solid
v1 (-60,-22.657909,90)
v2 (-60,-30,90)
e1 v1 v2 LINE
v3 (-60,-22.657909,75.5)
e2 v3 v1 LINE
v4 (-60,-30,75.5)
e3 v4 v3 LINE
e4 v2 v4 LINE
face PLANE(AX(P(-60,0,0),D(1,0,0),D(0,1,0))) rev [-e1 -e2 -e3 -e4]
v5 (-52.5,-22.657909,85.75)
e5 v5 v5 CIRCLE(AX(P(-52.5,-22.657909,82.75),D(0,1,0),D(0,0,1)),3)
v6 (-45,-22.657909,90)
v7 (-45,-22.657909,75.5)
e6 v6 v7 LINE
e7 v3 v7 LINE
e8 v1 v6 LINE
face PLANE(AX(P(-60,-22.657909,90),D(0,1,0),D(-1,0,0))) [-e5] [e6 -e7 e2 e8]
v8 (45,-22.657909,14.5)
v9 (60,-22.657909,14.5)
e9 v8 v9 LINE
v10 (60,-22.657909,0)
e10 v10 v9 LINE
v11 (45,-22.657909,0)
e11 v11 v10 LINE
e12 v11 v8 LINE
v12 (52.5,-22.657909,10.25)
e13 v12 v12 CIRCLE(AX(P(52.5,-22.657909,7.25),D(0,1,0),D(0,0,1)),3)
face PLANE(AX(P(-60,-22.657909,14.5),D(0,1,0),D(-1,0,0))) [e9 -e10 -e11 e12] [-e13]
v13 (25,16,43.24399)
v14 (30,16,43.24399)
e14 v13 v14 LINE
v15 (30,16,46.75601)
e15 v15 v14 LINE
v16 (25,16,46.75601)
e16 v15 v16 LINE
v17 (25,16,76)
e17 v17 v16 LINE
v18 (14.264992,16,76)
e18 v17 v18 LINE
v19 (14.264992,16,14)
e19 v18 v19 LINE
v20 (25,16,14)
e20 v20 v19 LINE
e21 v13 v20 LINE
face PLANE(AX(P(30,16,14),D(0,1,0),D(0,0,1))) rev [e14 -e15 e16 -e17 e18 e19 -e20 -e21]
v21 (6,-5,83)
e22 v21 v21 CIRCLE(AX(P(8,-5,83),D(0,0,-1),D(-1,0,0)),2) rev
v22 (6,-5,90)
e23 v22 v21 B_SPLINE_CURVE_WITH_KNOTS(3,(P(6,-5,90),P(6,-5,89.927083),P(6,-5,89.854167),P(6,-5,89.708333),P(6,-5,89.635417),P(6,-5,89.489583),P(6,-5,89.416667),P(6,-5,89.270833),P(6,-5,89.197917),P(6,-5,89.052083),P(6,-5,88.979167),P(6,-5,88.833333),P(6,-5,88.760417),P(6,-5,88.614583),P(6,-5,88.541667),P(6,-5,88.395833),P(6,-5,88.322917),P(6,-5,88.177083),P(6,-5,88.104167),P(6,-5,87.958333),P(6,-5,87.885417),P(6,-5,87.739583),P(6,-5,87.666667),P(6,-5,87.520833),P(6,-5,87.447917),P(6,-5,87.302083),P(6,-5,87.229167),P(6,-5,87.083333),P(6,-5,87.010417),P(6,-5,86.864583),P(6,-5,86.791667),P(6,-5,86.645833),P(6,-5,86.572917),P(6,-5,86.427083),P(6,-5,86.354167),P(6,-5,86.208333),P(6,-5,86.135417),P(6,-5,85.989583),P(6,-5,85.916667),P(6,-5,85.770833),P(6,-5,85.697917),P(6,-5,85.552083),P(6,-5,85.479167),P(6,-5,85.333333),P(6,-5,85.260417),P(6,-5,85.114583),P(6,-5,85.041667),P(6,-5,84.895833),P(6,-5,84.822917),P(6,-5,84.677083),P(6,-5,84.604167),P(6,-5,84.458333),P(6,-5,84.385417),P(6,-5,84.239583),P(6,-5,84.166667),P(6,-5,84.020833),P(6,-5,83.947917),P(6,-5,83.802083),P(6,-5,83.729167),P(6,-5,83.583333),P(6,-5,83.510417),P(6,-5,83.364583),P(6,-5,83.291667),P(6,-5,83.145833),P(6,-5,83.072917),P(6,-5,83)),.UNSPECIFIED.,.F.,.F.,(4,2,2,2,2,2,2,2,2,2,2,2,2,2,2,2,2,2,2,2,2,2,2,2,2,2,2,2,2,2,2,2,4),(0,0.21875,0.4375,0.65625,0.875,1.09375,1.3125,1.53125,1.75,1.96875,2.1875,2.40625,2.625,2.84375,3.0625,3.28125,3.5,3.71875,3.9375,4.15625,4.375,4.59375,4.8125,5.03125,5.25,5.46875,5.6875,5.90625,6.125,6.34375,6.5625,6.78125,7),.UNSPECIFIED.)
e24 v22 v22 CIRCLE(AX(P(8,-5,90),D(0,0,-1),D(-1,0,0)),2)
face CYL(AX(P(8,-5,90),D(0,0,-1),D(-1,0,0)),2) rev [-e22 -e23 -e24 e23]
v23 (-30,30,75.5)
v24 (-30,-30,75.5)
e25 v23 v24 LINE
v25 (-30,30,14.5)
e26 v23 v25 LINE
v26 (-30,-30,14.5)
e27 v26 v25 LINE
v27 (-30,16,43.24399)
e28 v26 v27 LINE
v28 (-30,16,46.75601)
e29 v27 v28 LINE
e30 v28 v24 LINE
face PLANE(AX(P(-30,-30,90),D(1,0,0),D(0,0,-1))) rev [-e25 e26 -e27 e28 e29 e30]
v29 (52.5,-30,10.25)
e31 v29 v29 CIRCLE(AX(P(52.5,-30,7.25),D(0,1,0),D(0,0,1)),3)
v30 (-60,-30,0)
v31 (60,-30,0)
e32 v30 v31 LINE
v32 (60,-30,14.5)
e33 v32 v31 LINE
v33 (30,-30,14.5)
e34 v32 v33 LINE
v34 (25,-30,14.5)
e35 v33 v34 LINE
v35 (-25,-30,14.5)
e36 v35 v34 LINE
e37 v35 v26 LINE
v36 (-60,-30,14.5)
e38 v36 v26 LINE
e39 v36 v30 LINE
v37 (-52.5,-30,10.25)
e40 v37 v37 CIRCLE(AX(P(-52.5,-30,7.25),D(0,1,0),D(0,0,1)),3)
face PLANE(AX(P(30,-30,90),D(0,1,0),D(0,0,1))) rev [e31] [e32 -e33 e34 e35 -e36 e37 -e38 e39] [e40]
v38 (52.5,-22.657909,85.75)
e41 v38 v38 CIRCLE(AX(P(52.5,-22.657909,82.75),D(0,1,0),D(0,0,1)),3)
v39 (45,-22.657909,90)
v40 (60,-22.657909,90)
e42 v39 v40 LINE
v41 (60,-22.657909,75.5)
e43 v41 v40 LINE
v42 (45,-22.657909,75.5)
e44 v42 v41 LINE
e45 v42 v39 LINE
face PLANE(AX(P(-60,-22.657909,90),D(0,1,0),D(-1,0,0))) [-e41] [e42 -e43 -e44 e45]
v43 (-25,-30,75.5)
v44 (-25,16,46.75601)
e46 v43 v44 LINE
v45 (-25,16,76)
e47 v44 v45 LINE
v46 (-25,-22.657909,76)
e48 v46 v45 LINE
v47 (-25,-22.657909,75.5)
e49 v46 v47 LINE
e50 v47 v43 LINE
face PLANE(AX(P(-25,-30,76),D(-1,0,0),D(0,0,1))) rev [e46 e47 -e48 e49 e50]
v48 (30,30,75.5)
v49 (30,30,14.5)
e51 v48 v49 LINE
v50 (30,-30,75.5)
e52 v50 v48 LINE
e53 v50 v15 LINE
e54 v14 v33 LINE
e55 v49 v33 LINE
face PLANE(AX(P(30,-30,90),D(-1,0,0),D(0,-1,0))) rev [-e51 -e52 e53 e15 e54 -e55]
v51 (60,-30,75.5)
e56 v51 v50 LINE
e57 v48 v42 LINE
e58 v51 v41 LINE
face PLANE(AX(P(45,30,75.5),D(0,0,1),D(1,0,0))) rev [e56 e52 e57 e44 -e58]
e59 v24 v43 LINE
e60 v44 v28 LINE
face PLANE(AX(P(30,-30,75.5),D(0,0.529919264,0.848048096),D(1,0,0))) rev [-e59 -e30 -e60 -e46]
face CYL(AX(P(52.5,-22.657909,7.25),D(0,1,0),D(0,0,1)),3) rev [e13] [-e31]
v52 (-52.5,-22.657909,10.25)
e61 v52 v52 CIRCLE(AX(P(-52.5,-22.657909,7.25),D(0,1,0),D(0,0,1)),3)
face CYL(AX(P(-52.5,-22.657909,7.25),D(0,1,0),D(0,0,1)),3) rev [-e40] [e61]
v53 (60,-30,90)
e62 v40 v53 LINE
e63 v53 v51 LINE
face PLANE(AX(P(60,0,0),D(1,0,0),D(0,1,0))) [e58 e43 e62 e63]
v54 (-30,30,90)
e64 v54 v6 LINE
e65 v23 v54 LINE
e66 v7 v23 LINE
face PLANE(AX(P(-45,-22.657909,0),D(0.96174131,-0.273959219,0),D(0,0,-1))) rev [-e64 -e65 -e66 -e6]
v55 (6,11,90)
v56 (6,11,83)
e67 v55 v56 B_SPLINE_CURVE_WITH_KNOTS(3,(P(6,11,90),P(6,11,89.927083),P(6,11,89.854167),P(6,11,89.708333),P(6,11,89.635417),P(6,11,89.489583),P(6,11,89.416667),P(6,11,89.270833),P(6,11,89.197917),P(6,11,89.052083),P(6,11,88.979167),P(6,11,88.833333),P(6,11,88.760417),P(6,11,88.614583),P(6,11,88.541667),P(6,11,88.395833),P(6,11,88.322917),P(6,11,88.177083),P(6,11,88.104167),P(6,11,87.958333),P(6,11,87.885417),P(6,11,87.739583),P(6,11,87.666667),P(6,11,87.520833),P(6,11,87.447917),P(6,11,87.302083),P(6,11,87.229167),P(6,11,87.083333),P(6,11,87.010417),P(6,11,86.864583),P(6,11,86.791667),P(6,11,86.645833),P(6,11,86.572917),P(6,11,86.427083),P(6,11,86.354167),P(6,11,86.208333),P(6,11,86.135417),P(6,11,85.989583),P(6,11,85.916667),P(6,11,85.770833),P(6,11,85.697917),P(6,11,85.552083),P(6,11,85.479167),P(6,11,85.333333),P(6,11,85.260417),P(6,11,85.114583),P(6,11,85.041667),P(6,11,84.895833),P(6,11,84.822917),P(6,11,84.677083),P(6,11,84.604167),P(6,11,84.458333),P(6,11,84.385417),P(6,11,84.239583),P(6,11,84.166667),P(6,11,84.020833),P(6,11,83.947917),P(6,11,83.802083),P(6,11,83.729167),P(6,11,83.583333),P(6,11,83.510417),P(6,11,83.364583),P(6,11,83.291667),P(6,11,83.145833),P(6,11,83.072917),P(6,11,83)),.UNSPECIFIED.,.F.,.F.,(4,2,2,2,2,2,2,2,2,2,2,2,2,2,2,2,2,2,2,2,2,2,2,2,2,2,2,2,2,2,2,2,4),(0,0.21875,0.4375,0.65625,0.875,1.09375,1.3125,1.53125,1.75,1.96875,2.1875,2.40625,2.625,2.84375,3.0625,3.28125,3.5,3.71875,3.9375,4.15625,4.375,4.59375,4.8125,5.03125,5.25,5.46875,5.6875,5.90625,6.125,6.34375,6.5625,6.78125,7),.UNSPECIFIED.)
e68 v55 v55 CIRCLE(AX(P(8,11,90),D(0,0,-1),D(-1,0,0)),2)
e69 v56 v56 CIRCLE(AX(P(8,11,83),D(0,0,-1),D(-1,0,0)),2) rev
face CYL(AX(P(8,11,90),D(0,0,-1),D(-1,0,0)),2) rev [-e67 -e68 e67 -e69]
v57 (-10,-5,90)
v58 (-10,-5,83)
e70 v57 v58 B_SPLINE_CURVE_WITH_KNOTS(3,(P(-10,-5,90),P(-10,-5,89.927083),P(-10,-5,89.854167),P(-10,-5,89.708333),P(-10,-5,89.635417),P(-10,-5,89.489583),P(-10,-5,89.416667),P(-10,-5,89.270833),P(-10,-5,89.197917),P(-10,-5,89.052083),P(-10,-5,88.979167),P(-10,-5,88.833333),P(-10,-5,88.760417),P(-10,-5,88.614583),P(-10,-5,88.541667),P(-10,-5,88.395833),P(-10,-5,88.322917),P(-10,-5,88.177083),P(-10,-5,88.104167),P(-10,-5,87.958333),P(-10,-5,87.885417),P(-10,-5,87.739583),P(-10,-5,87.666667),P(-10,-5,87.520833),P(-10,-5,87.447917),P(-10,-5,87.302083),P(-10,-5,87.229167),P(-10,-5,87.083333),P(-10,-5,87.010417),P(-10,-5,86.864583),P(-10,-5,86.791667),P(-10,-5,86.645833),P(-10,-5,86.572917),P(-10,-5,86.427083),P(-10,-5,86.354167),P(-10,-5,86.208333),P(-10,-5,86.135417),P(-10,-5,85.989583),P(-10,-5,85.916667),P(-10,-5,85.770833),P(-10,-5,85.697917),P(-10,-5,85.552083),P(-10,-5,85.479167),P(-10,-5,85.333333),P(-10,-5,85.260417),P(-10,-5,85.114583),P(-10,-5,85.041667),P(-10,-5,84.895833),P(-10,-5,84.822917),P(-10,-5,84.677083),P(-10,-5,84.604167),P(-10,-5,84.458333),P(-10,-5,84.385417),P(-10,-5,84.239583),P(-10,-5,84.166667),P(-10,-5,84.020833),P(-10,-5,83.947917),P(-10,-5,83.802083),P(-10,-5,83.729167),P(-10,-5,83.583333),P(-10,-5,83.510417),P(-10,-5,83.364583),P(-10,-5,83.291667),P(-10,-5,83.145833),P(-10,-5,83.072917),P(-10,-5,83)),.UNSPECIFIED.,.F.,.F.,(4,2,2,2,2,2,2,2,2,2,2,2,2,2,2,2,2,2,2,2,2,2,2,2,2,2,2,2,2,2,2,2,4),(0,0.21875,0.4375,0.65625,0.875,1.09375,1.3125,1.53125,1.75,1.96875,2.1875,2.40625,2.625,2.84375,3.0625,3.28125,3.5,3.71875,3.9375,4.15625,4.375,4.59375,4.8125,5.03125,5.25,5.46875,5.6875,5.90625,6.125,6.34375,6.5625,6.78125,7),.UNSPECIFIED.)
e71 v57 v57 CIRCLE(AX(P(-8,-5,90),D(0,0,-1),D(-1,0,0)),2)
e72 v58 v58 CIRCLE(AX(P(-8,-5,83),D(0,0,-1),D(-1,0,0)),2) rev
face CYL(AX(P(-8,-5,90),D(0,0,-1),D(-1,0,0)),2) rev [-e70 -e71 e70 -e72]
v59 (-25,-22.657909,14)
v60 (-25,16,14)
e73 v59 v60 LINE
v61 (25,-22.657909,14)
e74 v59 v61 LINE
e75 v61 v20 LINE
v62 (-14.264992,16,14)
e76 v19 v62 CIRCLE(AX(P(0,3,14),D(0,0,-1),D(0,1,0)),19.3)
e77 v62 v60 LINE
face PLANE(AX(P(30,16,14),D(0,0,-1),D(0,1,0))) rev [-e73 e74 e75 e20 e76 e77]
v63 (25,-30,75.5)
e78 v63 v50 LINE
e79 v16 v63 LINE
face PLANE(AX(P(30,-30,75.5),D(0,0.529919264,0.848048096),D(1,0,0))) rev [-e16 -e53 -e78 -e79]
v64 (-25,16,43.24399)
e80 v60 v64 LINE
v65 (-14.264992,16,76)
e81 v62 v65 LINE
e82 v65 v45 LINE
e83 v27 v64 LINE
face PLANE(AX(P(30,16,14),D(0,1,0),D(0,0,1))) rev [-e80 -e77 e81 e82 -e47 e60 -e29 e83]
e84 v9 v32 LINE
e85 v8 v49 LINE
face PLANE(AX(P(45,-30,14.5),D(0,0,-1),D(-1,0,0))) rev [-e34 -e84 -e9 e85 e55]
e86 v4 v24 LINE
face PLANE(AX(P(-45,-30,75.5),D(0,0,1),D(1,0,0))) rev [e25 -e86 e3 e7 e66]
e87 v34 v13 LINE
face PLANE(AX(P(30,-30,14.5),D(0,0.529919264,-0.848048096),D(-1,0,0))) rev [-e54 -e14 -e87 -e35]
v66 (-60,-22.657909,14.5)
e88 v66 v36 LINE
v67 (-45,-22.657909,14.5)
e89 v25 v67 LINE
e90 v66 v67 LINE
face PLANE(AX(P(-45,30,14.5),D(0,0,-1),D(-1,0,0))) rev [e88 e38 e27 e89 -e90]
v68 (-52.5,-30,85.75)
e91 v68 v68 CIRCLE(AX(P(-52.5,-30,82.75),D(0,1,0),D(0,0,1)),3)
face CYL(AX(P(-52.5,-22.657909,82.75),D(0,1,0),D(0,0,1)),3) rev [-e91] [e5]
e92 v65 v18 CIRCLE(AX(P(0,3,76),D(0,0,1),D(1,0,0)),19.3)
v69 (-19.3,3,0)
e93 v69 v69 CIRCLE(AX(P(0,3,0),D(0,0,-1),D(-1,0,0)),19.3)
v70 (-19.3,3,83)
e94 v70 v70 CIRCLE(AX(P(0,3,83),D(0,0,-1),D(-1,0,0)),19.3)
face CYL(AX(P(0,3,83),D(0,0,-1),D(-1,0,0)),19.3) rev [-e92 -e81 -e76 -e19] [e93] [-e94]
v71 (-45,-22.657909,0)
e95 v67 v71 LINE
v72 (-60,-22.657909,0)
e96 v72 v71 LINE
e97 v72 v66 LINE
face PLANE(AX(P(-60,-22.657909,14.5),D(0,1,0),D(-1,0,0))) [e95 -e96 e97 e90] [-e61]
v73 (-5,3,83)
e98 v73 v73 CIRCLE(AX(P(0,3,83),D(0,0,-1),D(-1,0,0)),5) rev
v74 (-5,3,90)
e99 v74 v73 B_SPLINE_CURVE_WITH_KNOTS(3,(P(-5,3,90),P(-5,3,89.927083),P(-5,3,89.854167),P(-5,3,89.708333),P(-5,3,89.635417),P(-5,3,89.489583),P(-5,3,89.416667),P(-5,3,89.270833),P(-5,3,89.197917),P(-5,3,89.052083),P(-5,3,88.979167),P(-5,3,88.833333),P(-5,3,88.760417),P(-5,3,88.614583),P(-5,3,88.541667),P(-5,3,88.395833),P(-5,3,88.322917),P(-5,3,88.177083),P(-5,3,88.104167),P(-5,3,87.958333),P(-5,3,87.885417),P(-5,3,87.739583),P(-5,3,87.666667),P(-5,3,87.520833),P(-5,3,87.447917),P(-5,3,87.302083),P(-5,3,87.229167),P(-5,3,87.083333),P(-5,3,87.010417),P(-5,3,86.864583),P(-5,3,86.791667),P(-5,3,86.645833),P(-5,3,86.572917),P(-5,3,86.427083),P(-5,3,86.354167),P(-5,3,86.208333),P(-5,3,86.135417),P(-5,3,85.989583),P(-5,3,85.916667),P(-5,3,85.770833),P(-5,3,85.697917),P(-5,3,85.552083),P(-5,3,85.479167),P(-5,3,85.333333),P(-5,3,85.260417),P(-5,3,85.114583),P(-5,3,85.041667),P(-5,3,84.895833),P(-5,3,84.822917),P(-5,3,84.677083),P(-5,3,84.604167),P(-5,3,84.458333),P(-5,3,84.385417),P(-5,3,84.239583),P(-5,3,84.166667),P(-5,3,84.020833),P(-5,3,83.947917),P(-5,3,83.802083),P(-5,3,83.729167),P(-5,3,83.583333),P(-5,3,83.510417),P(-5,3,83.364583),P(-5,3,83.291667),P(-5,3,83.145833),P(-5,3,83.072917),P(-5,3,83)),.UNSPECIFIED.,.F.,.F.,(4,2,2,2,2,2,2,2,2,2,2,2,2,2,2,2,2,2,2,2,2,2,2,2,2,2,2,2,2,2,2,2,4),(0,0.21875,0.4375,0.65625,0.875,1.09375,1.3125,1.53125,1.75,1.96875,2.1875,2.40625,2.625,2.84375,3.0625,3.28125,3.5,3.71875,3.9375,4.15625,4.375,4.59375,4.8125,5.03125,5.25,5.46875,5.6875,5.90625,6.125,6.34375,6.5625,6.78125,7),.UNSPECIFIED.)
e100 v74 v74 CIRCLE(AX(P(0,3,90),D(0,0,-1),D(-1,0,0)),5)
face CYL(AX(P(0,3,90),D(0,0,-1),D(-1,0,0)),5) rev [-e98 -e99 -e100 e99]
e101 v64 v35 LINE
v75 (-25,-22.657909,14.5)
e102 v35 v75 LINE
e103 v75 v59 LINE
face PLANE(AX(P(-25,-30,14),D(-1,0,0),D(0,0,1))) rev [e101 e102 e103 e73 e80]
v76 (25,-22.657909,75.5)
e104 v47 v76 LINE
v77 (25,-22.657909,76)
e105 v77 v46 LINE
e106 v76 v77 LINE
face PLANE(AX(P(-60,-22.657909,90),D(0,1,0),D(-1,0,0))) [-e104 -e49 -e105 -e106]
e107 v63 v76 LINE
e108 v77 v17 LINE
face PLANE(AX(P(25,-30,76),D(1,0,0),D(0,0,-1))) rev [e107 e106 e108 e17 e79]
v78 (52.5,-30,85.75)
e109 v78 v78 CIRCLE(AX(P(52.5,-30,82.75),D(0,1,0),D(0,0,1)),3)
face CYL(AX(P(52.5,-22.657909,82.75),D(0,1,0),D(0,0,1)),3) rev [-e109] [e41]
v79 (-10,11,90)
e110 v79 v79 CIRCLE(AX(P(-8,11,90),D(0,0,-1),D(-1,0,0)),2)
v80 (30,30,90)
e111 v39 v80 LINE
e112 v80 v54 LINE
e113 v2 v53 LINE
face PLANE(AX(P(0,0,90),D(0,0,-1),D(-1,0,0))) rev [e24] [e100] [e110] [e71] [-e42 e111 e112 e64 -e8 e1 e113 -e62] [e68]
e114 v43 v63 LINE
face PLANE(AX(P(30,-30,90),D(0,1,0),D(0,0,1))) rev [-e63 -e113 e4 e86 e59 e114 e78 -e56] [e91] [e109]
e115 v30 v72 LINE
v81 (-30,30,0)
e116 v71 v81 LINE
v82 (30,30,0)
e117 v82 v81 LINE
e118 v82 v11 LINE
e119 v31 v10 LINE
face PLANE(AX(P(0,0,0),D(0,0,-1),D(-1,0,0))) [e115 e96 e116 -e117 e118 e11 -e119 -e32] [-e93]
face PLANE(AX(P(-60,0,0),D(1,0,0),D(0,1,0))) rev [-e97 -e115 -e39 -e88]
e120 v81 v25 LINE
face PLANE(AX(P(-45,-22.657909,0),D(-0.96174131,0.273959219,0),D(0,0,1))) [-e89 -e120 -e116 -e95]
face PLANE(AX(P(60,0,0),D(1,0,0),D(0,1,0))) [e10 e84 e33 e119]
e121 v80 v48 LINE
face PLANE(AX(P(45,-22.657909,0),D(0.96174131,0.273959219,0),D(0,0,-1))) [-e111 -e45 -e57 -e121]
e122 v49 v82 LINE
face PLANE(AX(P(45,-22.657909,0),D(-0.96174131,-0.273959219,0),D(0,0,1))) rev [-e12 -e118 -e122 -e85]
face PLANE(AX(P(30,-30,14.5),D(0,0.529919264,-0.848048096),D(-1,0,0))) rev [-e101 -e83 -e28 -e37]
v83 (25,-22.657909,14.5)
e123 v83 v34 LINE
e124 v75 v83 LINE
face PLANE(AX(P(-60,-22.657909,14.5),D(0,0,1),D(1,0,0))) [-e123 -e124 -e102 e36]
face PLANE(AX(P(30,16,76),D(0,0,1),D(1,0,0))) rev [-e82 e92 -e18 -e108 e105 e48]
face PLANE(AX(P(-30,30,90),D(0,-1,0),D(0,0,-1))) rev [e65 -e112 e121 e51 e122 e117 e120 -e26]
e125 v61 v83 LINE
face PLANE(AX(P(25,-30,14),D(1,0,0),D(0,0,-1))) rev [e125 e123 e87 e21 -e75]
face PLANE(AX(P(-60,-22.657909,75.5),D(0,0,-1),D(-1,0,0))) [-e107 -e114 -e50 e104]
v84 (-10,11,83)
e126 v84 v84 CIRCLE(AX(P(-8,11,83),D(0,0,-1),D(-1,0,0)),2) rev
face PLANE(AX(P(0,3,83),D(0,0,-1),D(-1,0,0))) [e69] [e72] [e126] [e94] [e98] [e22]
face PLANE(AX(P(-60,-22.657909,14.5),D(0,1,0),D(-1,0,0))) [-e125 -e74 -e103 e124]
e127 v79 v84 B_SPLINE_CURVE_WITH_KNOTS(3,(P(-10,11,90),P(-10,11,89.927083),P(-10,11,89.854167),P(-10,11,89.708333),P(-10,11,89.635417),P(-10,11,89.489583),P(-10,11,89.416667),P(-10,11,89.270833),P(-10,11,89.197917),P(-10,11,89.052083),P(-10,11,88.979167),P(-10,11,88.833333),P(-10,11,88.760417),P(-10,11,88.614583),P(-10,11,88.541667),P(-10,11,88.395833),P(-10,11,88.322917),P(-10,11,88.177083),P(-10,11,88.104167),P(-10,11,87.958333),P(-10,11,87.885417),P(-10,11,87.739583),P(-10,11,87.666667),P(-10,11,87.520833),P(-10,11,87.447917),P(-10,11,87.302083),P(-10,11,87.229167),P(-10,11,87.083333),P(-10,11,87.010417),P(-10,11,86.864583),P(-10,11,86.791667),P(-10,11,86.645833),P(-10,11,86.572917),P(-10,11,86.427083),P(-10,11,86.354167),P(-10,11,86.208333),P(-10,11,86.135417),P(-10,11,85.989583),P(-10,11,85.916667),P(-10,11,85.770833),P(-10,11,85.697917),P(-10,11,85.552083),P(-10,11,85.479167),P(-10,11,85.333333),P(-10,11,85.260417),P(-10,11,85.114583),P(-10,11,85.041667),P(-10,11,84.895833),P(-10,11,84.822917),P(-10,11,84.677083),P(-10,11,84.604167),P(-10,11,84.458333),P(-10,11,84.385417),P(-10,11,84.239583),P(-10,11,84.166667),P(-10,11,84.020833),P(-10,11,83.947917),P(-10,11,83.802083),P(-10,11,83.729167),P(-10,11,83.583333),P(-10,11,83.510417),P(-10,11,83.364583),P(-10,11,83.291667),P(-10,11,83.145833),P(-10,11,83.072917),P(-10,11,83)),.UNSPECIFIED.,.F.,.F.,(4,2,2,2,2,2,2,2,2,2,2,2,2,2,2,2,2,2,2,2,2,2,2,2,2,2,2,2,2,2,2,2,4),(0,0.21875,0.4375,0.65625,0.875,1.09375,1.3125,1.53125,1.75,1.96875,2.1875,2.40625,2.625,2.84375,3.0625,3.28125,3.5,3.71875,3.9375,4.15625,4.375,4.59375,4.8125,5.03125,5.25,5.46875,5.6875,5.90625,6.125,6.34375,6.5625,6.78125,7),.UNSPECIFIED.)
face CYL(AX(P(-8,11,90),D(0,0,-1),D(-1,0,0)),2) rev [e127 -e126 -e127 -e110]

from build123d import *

# Parameters (mm, degrees)
SKETCH1_W                = 60
SKETCH1_H                = 60
BOSS_EXTRUDE1_DEPTH      = 90
CUT_EXTRUDE4_DEPTH       = 100.498743711
CUT_EXTRUDE4_DEPTH_BACK  = 100.498743711
SKETCH5_R                = 2
SKETCH5_R_2              = 5
CUT_EXTRUDE6_DEPTH       = 113.249721603
CUT_EXTRUDE6_DEPTH_BACK  = 113.249721603
SKETCH7_W                = 62
SKETCH7_H                = 50
SKETCH8_R                = 19.3
CUT_EXTRUDE7_DEPTH       = 83
SKETCH10_W               = 5
SKETCH10_H               = 30.5
BOSS_EXTRUDE2_DEPTH      = 46
CHAMFER1_SIZE            = 48.010035871
CHAMFER1_SIZE_2          = 30
SKETCH11_W               = 14.5
SKETCH11_H               = 60
BOSS_EXTRUDE3_DEPTH      = 15
SKETCH12_W               = 14.5
SKETCH12_H               = 60
BOSS_EXTRUDE4_DEPTH      = 15
CHAMFER2_SIZE            = 15
CHAMFER2_SIZE2           = 52.65790913
BOSS_EXTRUDE5_DEPTH      = 15
BOSS_EXTRUDE5_DEPTH_BACK = 105
SKETCH13_W               = 14.5
SKETCH13_H               = 7.34209087
F_6_0MM_DOWEL_HOLE1_D    = 6


with BuildPart() as part:
    # Sketch1 → Boss-Extrude1 (new body)
    with BuildSketch(Plane.XY):
        Rectangle(SKETCH1_W, SKETCH1_H)
    extrude(amount=BOSS_EXTRUDE1_DEPTH)

    # Sketch5 → Cut-Extrude4 (cut, two sides: drawn at the far end of the back side and taken through both)
    with BuildSketch(Plane(origin=(0, 0, 0), x_dir=(-1, 0, 0), z_dir=(0, 0, -1)).offset(-CUT_EXTRUDE4_DEPTH_BACK)):
        with Locations((-8, 11)):
            Circle(SKETCH5_R)
        with Locations((8, 11)):
            Circle(SKETCH5_R)
        with Locations((8, -5)):
            Circle(SKETCH5_R)
        with Locations((-8, -5)):
            Circle(SKETCH5_R)
        with Locations((0, 3)):
            Circle(SKETCH5_R_2)
    extrude(amount=CUT_EXTRUDE4_DEPTH + CUT_EXTRUDE4_DEPTH_BACK, mode=Mode.SUBTRACT)

    # Sketch7 → Cut-Extrude6 (cut, two sides: drawn at the far end of the back side and taken through both)
    with BuildSketch(Plane.ZY.offset(30).offset(-CUT_EXTRUDE6_DEPTH_BACK)):
        with Locations((45, -9)):
            Rectangle(SKETCH7_W, SKETCH7_H)
    extrude(amount=CUT_EXTRUDE6_DEPTH + CUT_EXTRUDE6_DEPTH_BACK, mode=Mode.SUBTRACT)

    # Sketch8 → Cut-Extrude7 (cut)
    with BuildSketch(Plane(origin=(0, 0, 0), x_dir=(-1, 0, 0), z_dir=(0, 0, -1))):
        with Locations((0, 3)):
            Circle(SKETCH8_R)
    extrude(amount=-CUT_EXTRUDE7_DEPTH, mode=Mode.SUBTRACT)

    # Sketch10 → Boss-Extrude2 (add)
    with BuildSketch(Plane.XZ.offset(-16)):
        with Locations((-27.5, 60.75)):
            Rectangle(SKETCH10_W, SKETCH10_H)
        with Locations((-27.5, 29.25)):
            Rectangle(SKETCH10_W, SKETCH10_H)
        with Locations((27.5, 60.75)):
            Rectangle(SKETCH10_W, SKETCH10_H)
        with Locations((27.5, 29.25)):
            Rectangle(SKETCH10_W, SKETCH10_H)
    extrude(amount=BOSS_EXTRUDE2_DEPTH)

    # Chamfer1
    # the kernel refuses this chamfer: 48.010035871, 30 mm, written as the material it takes off along each edge
    with BuildSketch(Plane(origin=(99.122648056, -30, 44.5), x_dir=(0, 0.9997899140358645, 0.02049701910421798), z_dir=(-1, 0, 0))) as chamfer1_piece_1_section:
        Polygon((CHAMFER1_SIZE * 0.999789914041, CHAMFER1_SIZE * 0.0204970191043), (-CHAMFER1_SIZE_2 * 0.0204970191042, CHAMFER1_SIZE_2 * 0.999789914036), (0, 0), align=None)
    chamfer1_piece_1 = extrude(amount=253.245296112, mode=Mode.PRIVATE)
    chamfer1_piece_1 = split(chamfer1_piece_1, bisect_by=Plane(origin=(-27.5, 16, 34.735639976), z_dir=(0, -1, 0)), keep=Keep.TOP, mode=Mode.PRIVATE)
    add(chamfer1_piece_1, mode=Mode.SUBTRACT)
    with BuildSketch(Plane(origin=(-99.122648056, -30, 44.5), x_dir=(0, 0.9997899140358645, 0.02049701910421798), z_dir=(1, 0, 0))) as chamfer1_piece_2_section:
        Polygon((CHAMFER1_SIZE * 0.999789914041, -CHAMFER1_SIZE * 0.0204970191043), (-CHAMFER1_SIZE_2 * 0.0204970191042, -CHAMFER1_SIZE_2 * 0.999789914036), (0, 0), align=None)
    chamfer1_piece_2 = extrude(amount=253.245296112, mode=Mode.PRIVATE)
    chamfer1_piece_2 = split(chamfer1_piece_2, bisect_by=Plane(origin=(27.5, 16, 34.735639976), z_dir=(0, -1, 0)), keep=Keep.TOP, mode=Mode.PRIVATE)
    add(chamfer1_piece_2, mode=Mode.SUBTRACT)
    with BuildSketch(Plane(origin=(-99.122648056, -30, 45.5), x_dir=(0, 0.9997899140358645, -0.020497019104217966), z_dir=(1, 0, 0))) as chamfer1_piece_3_section:
        Polygon((CHAMFER1_SIZE * 0.999789914041, CHAMFER1_SIZE * 0.0204970191043), (-CHAMFER1_SIZE_2 * 0.0204970191042, CHAMFER1_SIZE_2 * 0.999789914036), (0, 0), align=None)
    chamfer1_piece_3 = extrude(amount=253.245296112, mode=Mode.PRIVATE)
    chamfer1_piece_3 = split(chamfer1_piece_3, bisect_by=Plane(origin=(27.5, 16, 55.264360024), z_dir=(0, -1, 0)), keep=Keep.TOP, mode=Mode.PRIVATE)
    add(chamfer1_piece_3, mode=Mode.SUBTRACT)
    with BuildSketch(Plane(origin=(99.122648056, -30, 45.5), x_dir=(0, -0.05243311939005598, 0.9986244379099823), z_dir=(-1, 0, 0))) as chamfer1_piece_4_section:
        Polygon((CHAMFER1_SIZE_2 * 0.99862443791, CHAMFER1_SIZE_2 * 0.0524331193901), (-CHAMFER1_SIZE * 0.0524331193903, CHAMFER1_SIZE * 0.998624437915), (0, 0), align=None)
    chamfer1_piece_4 = extrude(amount=253.245296112, mode=Mode.PRIVATE)
    chamfer1_piece_4 = split(chamfer1_piece_4, bisect_by=Plane(origin=(-27.5, 16, 55.264360024), z_dir=(0, -1, 0)), keep=Keep.TOP, mode=Mode.PRIVATE)
    add(chamfer1_piece_4, mode=Mode.SUBTRACT)

    # Sketch11 → Boss-Extrude3 (add)
    with BuildSketch(Plane.ZY.offset(30)):
        with Locations((7.25, 0)):
            Rectangle(SKETCH11_W, SKETCH11_H)
        with Locations((82.75, 0)):
            Rectangle(SKETCH11_W, SKETCH11_H)
    extrude(amount=BOSS_EXTRUDE3_DEPTH)

    # Sketch12 → Boss-Extrude4 (add)
    with BuildSketch(Plane(origin=(30, 0, 0), x_dir=(0, 0, -1), z_dir=(1, 0, 0))):
        with Locations((-82.75, 0)):
            Rectangle(SKETCH12_W, SKETCH12_H)
        with Locations((-7.25, 0)):
            Rectangle(SKETCH12_W, SKETCH12_H)
    extrude(amount=BOSS_EXTRUDE4_DEPTH)

    # Chamfer2
    chamfer2_edges = [part.edges().sort_by_distance(p)[0] for p in [
        (-45, 30, 7.25),
        (-45, 30, 82.75),
        (45, 30, 82.75),
        (45, 30, 7.25),
    ]]
    chamfer2_side = [part.faces().sort_by_distance(p)[0] for p in [
        (0, 30, 45),
    ]]
    chamfer(chamfer2_edges, length=CHAMFER2_SIZE, length2=CHAMFER2_SIZE2, reference=chamfer2_side[0])

    # Sketch13 → Boss-Extrude5 (add, two sides: drawn at the far end of the back side and taken through both)
    with BuildSketch(Plane(origin=(45, 0, 0), x_dir=(0, 0, -1), z_dir=(1, 0, 0)).offset(-BOSS_EXTRUDE5_DEPTH_BACK)):
        with Locations((-82.75, -26.328954565)):
            Rectangle(SKETCH13_W, SKETCH13_H)
        with Locations((-7.25, -26.328954565)):
            Rectangle(SKETCH13_W, SKETCH13_H)
    extrude(amount=BOSS_EXTRUDE5_DEPTH + BOSS_EXTRUDE5_DEPTH_BACK)

    # Ø6.0mm Dowel Hole1 (through all)
    with Locations(Plane(origin=(52.5, -22.65790913, 82.75), x_dir=(1, 0, 0), z_dir=(0, 1, 0))):
        with Locations((0, 0), (0, 75.5), (-105, 75.5), (-105, 0)):
            Hole(F_6_0MM_DOWEL_HOLE1_D / 2)


solid = part.part
